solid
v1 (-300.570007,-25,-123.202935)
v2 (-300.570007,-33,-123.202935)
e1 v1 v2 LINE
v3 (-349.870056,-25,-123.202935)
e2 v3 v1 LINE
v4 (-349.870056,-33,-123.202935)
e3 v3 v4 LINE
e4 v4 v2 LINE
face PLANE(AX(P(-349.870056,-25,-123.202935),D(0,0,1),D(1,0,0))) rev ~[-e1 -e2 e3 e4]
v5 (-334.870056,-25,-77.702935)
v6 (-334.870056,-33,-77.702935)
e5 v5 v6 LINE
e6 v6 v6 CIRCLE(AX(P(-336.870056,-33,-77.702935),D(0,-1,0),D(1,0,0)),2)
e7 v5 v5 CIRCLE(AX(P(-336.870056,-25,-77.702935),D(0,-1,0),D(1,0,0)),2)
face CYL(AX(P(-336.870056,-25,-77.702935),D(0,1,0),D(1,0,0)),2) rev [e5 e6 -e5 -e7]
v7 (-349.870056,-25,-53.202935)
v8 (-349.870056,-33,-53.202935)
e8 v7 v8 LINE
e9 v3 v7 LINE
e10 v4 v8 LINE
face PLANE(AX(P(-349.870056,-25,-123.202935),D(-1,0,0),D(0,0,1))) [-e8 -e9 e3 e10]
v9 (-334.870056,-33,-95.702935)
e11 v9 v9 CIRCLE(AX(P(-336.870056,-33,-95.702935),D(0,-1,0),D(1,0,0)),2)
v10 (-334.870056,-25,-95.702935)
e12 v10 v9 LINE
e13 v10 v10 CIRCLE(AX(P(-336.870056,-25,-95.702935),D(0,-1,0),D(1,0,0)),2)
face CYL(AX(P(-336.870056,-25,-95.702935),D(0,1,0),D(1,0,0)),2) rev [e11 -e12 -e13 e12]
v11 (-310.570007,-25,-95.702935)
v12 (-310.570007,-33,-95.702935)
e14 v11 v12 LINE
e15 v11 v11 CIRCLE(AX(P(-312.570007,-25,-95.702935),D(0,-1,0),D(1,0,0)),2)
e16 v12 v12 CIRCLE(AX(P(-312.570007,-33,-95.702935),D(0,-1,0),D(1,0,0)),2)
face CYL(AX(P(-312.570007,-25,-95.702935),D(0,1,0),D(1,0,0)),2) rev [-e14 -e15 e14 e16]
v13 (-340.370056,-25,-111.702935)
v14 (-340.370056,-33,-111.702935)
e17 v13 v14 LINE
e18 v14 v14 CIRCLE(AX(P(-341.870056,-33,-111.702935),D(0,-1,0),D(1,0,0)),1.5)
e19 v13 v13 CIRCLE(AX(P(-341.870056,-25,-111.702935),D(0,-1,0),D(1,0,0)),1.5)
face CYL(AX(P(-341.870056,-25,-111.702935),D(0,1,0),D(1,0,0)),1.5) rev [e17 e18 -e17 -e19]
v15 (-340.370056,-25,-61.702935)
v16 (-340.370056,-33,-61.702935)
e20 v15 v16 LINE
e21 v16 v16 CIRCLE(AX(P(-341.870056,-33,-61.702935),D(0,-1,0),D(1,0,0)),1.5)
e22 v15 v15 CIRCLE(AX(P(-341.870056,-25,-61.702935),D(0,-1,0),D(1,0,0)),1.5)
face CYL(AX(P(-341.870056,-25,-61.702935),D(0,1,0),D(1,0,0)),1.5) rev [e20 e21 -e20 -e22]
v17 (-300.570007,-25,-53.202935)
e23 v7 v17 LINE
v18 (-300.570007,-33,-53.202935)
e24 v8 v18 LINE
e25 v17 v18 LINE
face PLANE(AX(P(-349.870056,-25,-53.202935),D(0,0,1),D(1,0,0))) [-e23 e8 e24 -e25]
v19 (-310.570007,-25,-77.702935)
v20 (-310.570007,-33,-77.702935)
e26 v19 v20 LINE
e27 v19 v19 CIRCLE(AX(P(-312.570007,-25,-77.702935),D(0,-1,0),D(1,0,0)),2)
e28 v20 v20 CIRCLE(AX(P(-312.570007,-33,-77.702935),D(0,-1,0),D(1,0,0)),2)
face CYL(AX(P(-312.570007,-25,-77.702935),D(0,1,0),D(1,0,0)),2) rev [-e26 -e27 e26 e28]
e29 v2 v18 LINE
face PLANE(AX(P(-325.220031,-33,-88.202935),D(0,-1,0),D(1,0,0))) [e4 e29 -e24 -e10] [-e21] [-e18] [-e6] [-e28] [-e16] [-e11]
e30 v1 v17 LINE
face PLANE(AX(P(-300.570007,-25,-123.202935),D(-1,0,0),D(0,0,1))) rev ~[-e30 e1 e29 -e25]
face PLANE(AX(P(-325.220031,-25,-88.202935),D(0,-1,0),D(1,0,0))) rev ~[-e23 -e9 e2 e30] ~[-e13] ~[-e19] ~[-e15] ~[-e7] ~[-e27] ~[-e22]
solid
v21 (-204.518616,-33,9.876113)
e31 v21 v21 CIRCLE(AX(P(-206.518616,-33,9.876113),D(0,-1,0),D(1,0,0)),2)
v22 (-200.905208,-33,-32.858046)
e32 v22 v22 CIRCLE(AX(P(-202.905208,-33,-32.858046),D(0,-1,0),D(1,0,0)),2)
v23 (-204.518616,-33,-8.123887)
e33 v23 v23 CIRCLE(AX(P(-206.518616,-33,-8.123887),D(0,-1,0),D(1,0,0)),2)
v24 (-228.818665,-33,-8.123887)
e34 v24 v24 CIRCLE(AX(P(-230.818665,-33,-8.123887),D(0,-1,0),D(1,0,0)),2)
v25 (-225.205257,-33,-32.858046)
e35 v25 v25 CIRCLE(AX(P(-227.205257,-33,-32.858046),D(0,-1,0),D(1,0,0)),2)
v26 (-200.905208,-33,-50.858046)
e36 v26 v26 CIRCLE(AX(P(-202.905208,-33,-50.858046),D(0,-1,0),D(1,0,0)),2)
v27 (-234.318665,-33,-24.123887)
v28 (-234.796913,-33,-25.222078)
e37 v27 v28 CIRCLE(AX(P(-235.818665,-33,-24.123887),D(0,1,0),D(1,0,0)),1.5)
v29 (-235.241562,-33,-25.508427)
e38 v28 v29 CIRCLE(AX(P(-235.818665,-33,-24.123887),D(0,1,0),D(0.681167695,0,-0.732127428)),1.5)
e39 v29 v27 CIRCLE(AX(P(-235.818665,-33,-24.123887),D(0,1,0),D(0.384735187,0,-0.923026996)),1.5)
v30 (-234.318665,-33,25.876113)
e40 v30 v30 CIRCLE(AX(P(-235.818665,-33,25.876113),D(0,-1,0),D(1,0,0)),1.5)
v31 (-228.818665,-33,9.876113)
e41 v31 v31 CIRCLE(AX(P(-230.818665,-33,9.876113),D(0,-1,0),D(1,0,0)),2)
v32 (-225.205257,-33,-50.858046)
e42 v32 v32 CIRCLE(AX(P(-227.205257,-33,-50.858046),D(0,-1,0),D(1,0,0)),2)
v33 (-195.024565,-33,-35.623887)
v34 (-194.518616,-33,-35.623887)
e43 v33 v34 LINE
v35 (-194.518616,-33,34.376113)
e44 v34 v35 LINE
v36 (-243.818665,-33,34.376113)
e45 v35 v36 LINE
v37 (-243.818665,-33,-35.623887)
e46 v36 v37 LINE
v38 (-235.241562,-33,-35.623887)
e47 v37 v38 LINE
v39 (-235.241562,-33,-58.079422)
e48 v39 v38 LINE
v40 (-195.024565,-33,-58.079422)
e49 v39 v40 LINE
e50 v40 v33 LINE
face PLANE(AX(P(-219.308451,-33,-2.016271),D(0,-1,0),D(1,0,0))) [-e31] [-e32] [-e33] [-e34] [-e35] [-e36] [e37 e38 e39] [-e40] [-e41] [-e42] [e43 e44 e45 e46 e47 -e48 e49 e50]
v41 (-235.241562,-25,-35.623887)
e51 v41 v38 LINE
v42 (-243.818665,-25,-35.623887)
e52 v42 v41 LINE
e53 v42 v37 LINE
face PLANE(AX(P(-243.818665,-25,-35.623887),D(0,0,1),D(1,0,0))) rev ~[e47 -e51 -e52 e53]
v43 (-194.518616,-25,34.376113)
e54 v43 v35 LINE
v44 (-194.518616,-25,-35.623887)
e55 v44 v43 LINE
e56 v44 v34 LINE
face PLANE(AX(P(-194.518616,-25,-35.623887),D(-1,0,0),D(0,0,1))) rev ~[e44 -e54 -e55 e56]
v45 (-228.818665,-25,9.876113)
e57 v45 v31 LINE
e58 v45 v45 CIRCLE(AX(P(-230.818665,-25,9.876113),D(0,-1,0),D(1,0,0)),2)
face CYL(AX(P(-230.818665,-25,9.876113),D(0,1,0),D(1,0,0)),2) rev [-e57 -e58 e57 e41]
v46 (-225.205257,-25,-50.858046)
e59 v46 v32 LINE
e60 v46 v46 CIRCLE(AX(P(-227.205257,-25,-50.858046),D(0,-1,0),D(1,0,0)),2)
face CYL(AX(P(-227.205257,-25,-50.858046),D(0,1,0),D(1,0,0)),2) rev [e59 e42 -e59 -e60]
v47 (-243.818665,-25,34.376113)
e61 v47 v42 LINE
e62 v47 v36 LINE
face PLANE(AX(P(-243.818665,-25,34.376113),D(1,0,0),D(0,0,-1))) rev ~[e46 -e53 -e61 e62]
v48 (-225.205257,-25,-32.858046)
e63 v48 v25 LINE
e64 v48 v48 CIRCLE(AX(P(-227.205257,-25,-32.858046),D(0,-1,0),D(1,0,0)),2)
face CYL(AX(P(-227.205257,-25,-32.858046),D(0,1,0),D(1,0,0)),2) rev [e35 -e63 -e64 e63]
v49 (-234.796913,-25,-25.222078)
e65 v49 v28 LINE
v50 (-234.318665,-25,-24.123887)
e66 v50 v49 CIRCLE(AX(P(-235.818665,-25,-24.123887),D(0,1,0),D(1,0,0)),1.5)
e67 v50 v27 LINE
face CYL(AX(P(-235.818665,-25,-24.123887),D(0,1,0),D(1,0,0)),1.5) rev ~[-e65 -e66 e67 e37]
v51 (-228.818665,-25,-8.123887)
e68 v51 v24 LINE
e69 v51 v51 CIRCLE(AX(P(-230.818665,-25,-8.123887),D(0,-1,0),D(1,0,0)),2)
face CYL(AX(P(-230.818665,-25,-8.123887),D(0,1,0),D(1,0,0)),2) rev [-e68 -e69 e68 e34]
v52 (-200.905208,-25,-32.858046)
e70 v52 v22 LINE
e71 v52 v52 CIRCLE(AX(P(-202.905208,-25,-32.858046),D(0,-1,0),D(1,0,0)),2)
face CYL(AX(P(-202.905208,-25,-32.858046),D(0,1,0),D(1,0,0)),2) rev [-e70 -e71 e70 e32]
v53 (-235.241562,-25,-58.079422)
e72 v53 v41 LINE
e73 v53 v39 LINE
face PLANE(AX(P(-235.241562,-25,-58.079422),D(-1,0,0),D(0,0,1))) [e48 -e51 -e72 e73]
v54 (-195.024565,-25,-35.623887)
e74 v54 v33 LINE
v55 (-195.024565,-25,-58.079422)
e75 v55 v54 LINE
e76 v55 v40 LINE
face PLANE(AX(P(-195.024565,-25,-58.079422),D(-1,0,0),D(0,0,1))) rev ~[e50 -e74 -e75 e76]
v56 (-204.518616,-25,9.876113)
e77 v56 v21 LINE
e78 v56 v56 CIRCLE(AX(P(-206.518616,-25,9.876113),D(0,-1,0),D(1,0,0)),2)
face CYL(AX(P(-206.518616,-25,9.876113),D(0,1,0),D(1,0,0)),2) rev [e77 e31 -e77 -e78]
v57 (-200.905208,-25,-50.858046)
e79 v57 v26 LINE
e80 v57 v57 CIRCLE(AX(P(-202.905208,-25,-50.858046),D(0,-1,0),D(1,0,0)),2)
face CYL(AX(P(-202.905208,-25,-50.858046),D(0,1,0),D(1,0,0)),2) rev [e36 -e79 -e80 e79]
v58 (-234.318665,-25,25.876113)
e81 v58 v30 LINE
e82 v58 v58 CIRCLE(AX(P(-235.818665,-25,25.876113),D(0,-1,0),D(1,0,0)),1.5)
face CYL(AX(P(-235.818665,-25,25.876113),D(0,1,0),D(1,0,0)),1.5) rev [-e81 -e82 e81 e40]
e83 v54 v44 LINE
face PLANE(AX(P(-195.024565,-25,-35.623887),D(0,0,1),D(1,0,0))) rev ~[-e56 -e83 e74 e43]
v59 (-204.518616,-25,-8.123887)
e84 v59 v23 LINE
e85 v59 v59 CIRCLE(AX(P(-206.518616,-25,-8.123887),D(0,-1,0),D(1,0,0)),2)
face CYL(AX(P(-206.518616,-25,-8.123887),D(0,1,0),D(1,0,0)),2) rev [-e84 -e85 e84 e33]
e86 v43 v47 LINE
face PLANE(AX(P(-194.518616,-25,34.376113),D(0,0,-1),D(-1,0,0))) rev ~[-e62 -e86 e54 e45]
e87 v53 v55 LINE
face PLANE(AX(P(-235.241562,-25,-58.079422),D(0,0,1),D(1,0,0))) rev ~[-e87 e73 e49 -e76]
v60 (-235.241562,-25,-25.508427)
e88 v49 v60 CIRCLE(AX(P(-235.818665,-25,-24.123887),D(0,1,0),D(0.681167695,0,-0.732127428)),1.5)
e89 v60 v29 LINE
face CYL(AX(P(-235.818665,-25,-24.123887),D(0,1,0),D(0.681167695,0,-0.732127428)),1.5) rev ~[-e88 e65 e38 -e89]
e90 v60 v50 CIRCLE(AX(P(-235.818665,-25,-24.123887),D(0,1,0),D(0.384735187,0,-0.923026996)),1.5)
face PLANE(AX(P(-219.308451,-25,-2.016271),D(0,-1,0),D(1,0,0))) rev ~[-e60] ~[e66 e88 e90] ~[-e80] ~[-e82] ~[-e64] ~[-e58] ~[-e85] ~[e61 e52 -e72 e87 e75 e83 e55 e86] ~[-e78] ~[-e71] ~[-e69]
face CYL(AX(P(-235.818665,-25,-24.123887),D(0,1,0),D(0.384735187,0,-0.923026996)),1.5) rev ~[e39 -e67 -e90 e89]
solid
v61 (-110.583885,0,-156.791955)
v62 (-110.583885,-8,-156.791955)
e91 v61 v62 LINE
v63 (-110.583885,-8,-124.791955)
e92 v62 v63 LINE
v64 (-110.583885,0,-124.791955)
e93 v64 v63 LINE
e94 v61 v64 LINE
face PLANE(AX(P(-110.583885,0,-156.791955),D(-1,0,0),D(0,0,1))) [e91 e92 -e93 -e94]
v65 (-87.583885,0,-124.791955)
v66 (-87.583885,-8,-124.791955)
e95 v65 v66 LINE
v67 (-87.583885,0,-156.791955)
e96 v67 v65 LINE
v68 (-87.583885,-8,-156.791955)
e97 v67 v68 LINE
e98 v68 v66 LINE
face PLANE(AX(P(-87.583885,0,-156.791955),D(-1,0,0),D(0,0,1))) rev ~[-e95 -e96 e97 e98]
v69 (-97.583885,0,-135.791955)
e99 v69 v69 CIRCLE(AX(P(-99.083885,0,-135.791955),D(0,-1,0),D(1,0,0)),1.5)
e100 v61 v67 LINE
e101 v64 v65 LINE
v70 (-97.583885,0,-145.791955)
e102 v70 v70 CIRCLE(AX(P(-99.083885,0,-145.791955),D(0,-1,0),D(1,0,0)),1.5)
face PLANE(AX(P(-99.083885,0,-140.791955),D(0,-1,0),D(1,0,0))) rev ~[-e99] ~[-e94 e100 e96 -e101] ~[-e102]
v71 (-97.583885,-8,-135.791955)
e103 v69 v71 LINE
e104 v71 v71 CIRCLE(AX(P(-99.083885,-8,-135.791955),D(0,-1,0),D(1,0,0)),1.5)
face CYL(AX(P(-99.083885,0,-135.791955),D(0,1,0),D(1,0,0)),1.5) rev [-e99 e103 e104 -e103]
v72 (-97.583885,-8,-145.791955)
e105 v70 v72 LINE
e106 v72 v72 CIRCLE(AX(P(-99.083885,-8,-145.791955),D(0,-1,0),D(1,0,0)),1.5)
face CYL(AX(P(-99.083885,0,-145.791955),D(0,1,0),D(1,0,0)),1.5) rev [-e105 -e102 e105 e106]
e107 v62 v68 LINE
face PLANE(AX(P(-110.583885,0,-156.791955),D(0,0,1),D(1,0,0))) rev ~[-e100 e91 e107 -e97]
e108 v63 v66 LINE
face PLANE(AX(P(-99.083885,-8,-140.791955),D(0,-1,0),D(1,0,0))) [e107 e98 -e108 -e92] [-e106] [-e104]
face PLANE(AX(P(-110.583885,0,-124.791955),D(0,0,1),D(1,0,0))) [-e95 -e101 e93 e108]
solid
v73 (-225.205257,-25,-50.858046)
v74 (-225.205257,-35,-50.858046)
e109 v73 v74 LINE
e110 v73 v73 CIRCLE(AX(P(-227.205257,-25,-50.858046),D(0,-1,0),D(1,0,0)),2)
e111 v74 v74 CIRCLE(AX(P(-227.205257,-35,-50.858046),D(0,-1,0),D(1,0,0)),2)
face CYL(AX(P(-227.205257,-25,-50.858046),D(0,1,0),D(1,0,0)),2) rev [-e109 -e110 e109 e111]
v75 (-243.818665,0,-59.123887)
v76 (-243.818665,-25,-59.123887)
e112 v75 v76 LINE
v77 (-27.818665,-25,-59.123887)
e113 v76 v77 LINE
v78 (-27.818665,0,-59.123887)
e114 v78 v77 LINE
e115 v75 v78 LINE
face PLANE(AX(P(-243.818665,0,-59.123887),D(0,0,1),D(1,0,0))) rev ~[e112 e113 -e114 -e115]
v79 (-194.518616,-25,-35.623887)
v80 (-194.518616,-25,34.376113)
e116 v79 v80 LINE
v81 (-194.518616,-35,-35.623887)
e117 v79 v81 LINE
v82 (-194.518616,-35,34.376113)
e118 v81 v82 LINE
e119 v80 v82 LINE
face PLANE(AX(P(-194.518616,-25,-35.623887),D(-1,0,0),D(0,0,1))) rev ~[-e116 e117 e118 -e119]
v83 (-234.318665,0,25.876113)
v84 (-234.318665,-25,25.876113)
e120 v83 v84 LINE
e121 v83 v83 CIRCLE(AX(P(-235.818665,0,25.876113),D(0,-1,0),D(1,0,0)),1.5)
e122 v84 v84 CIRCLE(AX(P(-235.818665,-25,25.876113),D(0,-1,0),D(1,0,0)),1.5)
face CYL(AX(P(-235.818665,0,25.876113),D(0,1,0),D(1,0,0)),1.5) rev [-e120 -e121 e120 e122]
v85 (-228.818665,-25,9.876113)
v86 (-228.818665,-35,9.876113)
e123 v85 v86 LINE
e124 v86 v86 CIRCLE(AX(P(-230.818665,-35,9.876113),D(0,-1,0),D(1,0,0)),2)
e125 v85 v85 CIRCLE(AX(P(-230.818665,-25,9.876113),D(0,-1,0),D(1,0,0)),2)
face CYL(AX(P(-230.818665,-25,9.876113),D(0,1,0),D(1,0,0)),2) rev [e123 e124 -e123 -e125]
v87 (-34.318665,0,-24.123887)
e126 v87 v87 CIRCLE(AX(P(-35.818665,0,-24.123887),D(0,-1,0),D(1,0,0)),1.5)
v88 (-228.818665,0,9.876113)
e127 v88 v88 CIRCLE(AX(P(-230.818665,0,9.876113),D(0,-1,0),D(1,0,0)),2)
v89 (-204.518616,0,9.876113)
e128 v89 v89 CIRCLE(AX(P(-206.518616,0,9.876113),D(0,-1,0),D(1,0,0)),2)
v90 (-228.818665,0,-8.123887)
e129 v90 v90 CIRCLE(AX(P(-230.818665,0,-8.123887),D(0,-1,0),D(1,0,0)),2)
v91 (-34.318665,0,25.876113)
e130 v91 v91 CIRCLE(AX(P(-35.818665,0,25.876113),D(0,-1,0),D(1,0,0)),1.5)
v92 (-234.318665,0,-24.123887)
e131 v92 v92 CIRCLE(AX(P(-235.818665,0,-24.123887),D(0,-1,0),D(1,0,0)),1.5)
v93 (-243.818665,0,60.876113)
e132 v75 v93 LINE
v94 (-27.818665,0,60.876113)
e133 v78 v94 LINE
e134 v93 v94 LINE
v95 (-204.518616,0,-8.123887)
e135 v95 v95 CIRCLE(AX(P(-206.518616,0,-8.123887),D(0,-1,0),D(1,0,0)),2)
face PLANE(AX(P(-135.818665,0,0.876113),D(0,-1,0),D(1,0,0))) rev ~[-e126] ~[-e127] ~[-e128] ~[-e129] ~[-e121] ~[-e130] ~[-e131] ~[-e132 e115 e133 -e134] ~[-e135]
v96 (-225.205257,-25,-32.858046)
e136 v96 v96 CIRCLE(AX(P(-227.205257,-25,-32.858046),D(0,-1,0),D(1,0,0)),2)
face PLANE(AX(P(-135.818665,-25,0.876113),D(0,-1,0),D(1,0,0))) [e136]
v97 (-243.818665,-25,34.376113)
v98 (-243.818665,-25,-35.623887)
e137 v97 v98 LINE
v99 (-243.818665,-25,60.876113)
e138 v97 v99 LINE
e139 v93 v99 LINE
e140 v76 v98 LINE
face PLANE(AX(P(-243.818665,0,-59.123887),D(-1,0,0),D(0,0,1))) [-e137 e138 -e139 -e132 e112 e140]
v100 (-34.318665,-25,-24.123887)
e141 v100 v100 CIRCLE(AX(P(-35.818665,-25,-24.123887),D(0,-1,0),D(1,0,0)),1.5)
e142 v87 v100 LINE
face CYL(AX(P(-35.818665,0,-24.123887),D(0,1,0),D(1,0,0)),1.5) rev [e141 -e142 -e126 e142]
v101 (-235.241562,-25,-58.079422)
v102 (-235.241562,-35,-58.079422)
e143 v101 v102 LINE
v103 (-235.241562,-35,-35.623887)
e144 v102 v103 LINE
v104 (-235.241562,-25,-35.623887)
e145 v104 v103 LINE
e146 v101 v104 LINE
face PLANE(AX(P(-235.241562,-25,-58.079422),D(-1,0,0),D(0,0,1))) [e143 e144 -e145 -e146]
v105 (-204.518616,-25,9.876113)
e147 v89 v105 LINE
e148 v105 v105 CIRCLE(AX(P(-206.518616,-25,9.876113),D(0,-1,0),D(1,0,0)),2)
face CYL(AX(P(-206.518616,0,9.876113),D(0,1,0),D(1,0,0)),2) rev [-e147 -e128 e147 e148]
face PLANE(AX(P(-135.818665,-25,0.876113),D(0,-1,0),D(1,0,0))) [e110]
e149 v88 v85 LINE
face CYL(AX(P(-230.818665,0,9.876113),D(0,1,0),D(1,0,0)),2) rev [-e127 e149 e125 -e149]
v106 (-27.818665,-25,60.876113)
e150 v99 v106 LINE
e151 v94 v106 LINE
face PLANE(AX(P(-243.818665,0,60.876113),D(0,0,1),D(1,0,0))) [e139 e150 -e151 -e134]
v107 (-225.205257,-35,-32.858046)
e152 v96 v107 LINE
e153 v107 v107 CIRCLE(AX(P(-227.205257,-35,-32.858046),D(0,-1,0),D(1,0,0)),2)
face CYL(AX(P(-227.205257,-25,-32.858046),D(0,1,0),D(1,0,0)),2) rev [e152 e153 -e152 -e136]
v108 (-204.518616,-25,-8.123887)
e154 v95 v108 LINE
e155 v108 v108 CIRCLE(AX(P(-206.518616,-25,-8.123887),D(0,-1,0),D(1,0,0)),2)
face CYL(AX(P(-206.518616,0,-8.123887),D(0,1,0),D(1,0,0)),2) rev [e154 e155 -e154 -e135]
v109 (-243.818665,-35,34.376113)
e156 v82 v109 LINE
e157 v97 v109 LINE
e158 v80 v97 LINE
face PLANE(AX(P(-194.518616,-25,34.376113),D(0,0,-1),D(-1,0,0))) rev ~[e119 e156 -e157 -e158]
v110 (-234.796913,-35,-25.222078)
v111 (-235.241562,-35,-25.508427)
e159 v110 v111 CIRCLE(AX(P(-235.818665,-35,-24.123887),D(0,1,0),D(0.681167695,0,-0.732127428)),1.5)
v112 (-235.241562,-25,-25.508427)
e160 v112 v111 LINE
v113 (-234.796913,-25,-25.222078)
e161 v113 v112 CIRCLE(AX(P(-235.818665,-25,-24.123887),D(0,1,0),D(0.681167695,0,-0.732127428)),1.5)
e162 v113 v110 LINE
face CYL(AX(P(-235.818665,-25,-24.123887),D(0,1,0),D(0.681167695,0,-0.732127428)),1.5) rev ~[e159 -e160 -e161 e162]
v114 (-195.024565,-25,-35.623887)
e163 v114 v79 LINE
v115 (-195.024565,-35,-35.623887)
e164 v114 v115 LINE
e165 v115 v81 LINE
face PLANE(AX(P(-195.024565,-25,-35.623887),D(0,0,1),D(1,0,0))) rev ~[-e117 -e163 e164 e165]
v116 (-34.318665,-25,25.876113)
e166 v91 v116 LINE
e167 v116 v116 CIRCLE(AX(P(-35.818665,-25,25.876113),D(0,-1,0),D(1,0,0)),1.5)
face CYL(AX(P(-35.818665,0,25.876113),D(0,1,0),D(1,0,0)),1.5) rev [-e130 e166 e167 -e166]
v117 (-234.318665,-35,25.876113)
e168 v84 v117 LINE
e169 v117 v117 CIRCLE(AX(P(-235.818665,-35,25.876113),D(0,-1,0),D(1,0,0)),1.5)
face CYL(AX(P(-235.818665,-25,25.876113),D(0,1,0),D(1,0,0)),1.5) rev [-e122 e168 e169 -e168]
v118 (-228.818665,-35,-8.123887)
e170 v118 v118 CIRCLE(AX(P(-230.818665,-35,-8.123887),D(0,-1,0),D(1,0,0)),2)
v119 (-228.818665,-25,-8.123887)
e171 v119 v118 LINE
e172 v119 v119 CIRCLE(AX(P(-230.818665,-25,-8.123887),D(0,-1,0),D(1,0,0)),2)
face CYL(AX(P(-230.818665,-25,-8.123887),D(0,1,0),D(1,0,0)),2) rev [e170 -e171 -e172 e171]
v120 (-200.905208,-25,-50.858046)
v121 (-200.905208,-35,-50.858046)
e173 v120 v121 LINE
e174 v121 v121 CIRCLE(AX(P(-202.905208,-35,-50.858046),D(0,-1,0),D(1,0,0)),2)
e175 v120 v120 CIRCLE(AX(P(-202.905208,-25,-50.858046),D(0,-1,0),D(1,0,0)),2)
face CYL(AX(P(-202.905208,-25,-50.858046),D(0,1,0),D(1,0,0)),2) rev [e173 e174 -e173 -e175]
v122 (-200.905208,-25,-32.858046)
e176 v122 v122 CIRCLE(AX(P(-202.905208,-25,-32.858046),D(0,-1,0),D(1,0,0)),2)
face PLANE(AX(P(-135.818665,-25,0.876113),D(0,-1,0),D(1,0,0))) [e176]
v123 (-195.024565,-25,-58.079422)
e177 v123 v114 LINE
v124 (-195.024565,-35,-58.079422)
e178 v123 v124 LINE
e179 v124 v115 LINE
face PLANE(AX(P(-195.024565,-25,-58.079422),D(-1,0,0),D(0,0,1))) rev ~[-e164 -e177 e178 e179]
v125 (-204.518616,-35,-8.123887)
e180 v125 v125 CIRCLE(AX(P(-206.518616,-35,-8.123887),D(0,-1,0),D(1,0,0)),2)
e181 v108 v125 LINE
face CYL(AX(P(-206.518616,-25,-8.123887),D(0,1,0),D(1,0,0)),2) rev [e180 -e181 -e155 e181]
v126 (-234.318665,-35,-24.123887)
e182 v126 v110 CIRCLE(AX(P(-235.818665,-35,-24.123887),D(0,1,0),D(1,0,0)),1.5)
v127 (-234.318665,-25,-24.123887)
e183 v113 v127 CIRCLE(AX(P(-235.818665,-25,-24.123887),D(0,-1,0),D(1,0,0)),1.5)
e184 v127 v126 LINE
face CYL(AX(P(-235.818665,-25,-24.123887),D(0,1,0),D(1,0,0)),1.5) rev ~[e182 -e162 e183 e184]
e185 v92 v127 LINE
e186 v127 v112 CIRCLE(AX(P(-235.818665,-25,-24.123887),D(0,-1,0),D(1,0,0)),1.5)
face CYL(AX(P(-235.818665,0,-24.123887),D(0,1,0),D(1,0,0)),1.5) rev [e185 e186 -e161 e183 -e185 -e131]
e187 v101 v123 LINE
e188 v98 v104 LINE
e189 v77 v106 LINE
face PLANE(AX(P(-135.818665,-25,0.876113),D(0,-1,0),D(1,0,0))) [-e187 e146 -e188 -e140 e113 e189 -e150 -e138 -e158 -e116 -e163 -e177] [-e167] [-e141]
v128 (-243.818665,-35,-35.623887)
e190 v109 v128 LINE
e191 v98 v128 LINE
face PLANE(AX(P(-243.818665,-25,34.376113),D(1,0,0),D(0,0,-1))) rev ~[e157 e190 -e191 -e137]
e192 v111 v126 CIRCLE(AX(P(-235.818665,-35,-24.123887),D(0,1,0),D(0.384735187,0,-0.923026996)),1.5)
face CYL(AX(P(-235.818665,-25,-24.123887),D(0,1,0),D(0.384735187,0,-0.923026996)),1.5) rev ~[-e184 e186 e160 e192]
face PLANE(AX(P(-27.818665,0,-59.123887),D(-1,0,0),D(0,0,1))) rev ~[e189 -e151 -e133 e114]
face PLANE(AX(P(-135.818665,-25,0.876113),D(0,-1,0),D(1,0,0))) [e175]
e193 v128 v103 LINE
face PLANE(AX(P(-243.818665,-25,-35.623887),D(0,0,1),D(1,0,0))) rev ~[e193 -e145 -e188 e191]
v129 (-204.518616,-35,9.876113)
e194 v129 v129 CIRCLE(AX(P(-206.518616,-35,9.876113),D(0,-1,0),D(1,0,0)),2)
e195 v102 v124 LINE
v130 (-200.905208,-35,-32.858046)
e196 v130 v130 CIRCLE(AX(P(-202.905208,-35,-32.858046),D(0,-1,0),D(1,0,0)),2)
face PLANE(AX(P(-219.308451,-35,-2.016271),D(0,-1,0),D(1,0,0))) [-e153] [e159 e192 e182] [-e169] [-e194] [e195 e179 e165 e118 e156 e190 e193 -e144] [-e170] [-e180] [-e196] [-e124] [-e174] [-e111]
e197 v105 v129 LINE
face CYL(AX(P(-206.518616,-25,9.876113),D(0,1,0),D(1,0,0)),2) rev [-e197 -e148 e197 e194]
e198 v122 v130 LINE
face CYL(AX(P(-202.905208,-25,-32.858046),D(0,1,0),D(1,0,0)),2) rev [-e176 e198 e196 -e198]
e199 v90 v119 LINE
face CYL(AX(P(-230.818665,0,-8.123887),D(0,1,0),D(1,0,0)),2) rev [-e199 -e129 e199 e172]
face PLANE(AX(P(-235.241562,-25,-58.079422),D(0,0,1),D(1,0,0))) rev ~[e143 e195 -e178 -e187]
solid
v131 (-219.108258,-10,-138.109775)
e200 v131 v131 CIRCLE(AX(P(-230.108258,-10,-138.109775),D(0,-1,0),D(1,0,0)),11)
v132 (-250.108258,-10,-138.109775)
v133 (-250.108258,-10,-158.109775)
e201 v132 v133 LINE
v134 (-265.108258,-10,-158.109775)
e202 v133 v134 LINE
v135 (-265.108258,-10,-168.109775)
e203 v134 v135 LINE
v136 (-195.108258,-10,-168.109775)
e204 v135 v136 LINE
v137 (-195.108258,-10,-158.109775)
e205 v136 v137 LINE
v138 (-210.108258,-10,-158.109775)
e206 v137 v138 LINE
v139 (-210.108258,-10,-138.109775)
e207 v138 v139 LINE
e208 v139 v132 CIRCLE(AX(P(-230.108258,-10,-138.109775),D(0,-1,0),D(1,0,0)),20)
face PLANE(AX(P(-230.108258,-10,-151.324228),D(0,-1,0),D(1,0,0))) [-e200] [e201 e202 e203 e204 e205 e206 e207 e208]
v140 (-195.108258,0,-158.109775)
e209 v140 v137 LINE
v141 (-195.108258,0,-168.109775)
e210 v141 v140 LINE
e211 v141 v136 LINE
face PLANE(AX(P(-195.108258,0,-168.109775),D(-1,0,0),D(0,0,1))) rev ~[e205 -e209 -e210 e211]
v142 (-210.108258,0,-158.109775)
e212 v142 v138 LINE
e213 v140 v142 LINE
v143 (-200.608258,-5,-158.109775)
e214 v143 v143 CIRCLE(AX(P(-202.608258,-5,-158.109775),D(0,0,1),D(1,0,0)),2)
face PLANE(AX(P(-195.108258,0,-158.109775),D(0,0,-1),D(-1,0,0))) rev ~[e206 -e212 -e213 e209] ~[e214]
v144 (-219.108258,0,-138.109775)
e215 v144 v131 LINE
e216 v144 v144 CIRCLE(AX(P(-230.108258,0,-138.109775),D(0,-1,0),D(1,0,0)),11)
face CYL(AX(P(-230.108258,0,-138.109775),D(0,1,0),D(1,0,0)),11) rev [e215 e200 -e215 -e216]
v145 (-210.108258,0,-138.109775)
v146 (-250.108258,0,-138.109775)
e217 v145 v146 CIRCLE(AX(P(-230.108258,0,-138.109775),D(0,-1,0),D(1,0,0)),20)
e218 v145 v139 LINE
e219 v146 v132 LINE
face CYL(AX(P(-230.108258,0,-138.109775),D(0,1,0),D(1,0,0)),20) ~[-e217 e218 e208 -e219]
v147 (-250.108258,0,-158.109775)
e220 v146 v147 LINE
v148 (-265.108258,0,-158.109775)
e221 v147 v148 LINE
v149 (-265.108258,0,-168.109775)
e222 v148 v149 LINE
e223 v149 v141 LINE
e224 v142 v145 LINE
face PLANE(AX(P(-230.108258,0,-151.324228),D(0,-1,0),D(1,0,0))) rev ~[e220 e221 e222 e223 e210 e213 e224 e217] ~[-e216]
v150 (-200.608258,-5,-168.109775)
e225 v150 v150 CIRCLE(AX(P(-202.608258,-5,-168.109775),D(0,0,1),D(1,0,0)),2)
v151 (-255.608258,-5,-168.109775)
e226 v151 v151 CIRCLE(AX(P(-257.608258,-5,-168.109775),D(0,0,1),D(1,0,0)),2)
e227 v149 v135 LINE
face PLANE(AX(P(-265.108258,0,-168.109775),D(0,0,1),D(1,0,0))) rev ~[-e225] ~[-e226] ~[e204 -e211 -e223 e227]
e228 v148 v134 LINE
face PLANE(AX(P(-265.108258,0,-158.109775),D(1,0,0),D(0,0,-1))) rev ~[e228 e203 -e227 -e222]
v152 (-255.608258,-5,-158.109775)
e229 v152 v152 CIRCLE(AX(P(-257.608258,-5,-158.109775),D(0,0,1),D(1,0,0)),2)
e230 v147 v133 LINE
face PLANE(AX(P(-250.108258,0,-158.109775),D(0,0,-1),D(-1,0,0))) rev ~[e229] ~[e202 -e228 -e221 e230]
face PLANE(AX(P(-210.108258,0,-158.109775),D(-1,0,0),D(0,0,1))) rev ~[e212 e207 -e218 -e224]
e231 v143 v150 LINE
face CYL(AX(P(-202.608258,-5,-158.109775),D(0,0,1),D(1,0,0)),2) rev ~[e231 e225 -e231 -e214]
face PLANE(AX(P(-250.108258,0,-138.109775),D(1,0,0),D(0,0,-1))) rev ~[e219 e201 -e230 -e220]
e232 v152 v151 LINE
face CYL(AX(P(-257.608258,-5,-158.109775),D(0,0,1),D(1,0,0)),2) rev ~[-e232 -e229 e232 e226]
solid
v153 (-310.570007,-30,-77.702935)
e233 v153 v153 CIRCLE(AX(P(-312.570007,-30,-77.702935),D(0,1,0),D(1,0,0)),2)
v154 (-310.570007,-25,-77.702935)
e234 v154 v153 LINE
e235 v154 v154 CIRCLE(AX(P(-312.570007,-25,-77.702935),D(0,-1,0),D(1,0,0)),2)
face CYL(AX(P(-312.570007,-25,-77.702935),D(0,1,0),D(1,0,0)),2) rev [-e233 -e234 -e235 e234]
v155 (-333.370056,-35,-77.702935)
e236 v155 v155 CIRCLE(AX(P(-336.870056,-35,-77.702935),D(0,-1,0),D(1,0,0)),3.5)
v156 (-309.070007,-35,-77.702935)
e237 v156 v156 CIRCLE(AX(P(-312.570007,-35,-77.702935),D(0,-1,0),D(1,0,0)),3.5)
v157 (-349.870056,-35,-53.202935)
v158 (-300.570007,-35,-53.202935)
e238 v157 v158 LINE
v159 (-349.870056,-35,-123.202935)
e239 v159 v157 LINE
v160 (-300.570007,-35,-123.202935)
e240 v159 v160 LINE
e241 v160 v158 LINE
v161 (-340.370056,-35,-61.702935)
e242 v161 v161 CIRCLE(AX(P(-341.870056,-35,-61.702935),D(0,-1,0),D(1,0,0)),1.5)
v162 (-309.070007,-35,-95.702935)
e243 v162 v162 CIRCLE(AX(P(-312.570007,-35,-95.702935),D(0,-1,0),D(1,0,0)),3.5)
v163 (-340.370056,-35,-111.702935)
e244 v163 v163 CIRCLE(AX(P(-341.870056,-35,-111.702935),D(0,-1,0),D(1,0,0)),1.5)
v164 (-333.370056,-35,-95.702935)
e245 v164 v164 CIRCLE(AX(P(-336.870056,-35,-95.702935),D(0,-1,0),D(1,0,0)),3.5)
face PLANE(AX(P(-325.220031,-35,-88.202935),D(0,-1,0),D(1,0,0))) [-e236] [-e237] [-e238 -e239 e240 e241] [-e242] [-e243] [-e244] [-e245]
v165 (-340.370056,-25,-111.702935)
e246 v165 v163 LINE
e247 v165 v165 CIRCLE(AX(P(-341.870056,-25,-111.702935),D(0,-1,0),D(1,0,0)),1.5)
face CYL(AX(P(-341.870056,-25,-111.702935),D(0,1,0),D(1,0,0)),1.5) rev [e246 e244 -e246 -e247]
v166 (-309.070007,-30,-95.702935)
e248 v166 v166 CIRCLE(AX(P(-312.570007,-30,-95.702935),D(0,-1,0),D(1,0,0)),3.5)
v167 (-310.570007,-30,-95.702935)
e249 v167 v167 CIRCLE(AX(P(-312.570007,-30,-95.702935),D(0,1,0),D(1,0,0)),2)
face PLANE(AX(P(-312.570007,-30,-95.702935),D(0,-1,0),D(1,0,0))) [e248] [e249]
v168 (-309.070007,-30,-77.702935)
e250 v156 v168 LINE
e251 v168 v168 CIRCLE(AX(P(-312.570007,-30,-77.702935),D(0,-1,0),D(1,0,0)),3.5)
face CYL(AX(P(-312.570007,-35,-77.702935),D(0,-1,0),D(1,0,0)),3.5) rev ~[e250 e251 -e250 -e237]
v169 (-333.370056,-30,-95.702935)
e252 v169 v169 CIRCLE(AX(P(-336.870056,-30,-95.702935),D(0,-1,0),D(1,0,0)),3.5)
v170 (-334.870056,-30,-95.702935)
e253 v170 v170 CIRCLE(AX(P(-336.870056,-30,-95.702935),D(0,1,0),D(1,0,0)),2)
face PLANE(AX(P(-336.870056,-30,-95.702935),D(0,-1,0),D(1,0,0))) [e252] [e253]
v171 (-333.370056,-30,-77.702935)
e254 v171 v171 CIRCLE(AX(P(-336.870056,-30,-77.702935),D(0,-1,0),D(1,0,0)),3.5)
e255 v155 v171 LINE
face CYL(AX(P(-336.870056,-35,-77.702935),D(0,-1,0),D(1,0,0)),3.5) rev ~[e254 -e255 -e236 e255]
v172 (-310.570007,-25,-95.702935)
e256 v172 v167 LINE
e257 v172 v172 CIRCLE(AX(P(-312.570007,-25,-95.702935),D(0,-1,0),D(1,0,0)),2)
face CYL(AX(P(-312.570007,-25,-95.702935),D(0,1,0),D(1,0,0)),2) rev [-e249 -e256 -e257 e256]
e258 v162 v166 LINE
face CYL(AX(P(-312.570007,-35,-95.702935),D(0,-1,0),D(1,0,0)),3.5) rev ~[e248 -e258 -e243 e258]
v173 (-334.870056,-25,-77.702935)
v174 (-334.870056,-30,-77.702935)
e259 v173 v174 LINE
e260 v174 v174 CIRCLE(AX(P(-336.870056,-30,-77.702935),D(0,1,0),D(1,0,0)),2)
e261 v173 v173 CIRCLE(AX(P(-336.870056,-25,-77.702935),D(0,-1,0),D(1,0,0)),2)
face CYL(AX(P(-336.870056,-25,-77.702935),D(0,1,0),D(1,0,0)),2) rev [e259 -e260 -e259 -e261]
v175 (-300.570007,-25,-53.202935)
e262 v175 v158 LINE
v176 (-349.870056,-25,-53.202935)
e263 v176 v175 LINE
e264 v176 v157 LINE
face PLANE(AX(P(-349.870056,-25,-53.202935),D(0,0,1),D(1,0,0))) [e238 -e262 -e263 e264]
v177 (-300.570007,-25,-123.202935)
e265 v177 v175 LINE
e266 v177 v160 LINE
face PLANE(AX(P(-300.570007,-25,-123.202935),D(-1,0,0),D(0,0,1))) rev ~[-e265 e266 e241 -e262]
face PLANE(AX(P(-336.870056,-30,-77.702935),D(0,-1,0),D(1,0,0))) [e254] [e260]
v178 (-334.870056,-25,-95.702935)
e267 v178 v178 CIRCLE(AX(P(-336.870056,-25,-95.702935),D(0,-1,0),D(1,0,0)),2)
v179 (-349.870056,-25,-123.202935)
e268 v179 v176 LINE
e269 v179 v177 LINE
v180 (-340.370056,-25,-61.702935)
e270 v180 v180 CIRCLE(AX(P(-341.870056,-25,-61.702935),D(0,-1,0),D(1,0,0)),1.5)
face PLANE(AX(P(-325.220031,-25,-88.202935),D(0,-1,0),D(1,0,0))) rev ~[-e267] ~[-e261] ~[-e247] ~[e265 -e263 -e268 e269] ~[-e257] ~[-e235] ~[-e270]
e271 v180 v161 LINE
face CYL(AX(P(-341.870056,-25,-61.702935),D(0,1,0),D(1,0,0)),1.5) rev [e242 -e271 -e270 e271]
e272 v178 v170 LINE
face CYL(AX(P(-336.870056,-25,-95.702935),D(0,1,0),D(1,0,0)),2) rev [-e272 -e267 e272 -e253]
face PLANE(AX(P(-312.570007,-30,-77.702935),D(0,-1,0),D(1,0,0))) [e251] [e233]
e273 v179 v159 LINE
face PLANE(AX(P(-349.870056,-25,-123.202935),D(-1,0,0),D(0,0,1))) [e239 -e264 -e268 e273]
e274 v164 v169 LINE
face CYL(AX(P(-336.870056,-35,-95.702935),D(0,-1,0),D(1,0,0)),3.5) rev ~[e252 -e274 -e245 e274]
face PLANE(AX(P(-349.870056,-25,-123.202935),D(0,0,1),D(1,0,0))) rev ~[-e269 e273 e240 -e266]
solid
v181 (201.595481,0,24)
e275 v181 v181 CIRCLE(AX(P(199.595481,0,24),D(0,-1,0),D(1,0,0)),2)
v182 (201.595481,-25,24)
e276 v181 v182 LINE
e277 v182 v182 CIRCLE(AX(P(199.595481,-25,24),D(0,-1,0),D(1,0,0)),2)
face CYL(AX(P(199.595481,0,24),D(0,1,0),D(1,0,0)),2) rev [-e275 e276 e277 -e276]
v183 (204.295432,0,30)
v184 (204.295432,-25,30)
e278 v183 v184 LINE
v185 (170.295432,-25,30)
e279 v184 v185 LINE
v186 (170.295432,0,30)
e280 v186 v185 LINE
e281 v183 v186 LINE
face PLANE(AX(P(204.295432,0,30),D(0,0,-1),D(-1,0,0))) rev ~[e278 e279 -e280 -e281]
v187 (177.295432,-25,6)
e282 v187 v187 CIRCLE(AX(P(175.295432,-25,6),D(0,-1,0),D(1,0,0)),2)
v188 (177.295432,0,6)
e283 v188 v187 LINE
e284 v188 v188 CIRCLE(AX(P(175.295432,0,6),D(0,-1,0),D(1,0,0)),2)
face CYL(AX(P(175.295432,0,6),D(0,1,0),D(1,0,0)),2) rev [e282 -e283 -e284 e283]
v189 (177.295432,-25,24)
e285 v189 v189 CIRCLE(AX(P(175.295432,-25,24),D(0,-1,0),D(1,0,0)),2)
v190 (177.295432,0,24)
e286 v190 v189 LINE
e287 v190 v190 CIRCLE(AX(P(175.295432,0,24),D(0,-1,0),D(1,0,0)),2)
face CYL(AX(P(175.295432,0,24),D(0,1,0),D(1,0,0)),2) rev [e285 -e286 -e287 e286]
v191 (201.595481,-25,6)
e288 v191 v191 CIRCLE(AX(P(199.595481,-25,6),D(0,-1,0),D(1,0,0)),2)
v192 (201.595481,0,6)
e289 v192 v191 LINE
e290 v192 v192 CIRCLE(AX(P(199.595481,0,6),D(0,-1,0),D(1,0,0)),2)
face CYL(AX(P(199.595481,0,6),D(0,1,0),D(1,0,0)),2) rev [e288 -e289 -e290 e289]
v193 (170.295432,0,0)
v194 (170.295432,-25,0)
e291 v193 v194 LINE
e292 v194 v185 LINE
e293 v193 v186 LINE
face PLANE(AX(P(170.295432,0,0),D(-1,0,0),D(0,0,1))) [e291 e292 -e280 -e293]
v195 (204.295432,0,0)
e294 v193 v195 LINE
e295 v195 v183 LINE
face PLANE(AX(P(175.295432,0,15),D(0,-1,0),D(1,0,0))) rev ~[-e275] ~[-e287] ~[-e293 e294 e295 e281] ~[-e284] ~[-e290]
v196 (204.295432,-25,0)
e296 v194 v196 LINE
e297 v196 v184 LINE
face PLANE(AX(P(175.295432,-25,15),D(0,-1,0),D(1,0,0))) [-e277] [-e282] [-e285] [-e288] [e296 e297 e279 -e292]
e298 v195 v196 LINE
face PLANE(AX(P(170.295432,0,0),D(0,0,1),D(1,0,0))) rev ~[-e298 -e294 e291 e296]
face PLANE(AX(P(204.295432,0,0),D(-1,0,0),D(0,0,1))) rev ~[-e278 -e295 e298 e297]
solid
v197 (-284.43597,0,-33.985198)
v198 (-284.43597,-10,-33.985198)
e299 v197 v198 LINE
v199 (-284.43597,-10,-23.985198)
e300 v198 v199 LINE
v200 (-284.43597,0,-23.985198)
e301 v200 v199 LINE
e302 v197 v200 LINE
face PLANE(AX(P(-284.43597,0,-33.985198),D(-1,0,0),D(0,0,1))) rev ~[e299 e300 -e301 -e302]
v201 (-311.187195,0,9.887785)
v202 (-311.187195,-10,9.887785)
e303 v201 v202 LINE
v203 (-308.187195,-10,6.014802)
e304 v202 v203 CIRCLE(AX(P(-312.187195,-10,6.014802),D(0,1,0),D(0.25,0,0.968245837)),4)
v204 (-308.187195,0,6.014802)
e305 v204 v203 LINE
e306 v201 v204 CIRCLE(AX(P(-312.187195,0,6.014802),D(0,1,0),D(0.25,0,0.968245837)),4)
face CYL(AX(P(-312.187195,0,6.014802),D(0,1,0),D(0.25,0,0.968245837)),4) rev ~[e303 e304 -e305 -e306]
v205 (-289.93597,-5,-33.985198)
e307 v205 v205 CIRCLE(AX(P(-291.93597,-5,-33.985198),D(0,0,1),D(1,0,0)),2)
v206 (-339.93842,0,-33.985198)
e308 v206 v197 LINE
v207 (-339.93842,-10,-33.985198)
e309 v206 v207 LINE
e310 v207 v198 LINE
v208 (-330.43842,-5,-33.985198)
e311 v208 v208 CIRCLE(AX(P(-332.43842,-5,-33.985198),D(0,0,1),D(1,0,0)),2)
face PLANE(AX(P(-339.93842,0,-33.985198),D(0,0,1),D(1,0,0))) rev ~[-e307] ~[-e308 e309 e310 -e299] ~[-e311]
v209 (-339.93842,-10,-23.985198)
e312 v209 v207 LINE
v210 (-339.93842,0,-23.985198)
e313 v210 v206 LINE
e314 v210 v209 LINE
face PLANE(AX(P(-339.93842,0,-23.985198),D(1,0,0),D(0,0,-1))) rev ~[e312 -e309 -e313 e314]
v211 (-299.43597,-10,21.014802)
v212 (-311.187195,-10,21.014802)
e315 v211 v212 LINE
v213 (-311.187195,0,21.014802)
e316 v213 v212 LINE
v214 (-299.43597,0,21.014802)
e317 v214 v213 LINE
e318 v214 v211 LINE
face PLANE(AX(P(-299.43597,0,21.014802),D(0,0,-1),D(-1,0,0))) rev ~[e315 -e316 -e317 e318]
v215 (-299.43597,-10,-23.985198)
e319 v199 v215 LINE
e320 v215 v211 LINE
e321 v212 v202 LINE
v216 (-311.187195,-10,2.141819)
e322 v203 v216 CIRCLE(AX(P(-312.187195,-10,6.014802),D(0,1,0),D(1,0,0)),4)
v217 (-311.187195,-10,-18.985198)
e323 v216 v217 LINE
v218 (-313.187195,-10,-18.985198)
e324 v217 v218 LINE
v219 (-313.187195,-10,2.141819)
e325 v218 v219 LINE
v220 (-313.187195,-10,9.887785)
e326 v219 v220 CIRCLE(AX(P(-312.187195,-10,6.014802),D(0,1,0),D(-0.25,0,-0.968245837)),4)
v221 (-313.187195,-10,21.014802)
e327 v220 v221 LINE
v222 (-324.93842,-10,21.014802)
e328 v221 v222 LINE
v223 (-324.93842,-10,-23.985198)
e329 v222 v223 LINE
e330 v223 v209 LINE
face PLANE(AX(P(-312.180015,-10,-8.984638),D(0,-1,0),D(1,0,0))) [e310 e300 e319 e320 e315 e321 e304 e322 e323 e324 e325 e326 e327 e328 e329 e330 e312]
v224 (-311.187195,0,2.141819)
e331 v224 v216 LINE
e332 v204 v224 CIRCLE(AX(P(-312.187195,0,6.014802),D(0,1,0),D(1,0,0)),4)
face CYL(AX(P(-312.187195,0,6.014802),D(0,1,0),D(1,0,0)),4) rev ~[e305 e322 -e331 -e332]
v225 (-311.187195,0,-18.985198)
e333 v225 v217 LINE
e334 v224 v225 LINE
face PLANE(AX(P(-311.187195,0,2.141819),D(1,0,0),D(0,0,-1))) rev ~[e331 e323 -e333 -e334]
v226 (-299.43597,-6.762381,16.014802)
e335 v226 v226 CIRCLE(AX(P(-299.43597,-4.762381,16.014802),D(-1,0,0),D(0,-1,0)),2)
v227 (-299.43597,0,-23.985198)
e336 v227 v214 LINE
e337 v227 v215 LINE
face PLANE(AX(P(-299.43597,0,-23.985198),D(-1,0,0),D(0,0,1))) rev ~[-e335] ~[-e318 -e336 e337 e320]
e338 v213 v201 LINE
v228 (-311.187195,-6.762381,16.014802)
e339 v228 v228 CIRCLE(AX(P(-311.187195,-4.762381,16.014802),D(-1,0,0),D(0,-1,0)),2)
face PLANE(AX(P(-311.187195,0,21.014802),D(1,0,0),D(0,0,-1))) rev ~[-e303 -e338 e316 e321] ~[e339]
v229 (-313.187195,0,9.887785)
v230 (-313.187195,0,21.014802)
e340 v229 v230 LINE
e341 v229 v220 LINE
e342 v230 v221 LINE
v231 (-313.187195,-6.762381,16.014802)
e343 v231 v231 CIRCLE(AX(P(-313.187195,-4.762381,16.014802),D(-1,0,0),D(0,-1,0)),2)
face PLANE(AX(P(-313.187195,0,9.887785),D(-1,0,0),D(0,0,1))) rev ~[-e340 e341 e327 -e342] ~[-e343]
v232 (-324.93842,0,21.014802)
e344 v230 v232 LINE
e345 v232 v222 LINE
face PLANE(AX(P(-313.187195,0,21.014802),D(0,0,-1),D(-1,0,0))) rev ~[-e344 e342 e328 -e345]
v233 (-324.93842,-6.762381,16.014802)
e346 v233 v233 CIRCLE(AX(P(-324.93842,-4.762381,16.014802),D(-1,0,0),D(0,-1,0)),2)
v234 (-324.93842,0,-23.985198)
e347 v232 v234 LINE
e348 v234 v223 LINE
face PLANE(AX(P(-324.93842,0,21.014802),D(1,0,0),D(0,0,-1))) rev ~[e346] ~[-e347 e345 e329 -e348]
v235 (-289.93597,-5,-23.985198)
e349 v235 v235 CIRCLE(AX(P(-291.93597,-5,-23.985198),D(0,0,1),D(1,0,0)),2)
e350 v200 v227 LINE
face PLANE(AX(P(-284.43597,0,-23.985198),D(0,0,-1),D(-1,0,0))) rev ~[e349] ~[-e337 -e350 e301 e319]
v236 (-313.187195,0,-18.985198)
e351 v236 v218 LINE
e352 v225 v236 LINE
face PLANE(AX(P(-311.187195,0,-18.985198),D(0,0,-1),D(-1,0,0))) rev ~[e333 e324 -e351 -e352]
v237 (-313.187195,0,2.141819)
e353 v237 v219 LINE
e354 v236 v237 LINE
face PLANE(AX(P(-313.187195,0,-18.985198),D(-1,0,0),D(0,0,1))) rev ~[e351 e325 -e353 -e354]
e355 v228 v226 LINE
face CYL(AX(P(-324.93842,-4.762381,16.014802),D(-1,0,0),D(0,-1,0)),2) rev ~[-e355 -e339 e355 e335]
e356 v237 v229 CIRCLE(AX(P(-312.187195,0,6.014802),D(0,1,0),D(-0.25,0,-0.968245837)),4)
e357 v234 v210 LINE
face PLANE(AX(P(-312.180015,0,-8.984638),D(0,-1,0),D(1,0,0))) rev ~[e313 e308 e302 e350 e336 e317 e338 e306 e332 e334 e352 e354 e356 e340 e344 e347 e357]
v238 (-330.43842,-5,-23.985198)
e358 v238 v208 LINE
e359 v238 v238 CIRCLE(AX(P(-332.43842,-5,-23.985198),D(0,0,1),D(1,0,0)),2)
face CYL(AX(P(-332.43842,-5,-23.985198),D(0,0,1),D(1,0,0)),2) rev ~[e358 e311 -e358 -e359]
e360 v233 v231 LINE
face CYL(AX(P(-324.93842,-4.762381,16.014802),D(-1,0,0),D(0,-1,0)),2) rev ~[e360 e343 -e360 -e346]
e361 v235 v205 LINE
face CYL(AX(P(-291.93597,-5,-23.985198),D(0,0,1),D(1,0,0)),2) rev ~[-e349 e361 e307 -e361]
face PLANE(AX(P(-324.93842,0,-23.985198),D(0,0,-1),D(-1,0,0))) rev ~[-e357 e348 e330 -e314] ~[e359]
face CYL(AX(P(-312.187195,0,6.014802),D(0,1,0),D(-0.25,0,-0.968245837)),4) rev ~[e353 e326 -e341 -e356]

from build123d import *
from build123d import SkipClean  # not in build123d's __all__

# Parameters (mm, degrees)
F0_R      = 11
F1_DEPTH  = 10
F2_R      = 2
F3_DEPTH  = 25
F4_DEPTH  = 10
F5_R      = 2
F6_DEPTH  = 36.2
F8_R      = 2
F7_R      = 2
F9_DEPTH  = 25
F10_W     = 10
F10_H     = 30
F10_R     = 2
F10_W_2   = 14
F11_DEPTH = 25
F10_W_3   = 216
F10_H_2   = 120
F10_R_2   = 1.5
F12_R     = 2
F12_R_2   = 1.5
F12_W     = 40.2169972658
F12_H     = 22.4555346966
F13_DEPTH = 10
F12_W_2   = 49.3000489473
F12_H_2   = 70
F14_R     = 3.5
F15_DEPTH = 5
F0_W      = 23
F0_H      = 32
F0_R_2    = 1.5
F16_DEPTH = 8


# Not quite as in the source:
# - a feature names something its author has since deleted; it is built from what else it names


with BuildPart() as f1:
    # F0 (on Front) → F1 (new body)
    with BuildSketch(Plane.XZ):
        with BuildLine():
            ThreePointArc((-210.1082575321, -138.1097745895), (-230.1082575321, -118.1097745895), (-250.1082575321, -138.1097745895))
            Line((-250.1082575321, -138.1097745895), (-250.1082575321, -158.1097745895))
            Line((-250.1082575321, -158.1097745895), (-265.1082575321, -158.1097745895))
            Line((-265.1082575321, -158.1097745895), (-265.1082575321, -168.1097745895))
            Line((-265.1082575321, -168.1097745895), (-195.1082575321, -168.1097745895))
            Line((-195.1082575321, -168.1097745895), (-195.1082575321, -158.1097745895))
            Line((-195.1082575321, -158.1097745895), (-210.1082575321, -158.1097745895))
            Line((-210.1082575321, -158.1097745895), (-210.1082575321, -138.1097745895))
        make_face()
        with Locations((-230.1082575321, -138.1097745895)):
            Circle(F0_R, mode=Mode.SUBTRACT)
    extrude(amount=F1_DEPTH)

    # F2 (on face) → F3 (cut)
    with BuildSketch(Plane.XY.offset(-158.1097745895)):
        with Locations((-257.6082575321, -5)):
            Circle(F2_R)
        with Locations((-202.6082575321, -5)):
            Circle(F2_R)
    extrude(amount=-F3_DEPTH, mode=Mode.SUBTRACT)


with BuildPart() as f4:
    # F0 (on Front) → F4 (new body)
    with BuildSketch(Plane.XZ):
        with BuildLine():
            Line((-313.1871948242, 21.0148020371), (-324.9384198033, 21.0148020371))
            Line((-324.9384198033, 21.0148020371), (-324.9384198033, -23.9851979629))
            Line((-324.9384198033, -23.9851979629), (-339.9384198033, -23.9851979629))
            Line((-339.9384198033, -23.9851979629), (-339.9384198033, -33.9851979629))
            Line((-339.9384198033, -33.9851979629), (-284.4359698451, -33.9851979629))
            Line((-284.4359698451, -33.9851979629), (-284.4359698451, -23.9851979629))
            Line((-284.4359698451, -23.9851979629), (-299.4359698451, -23.9851979629))
            Line((-299.4359698451, -23.9851979629), (-299.4359698451, 21.0148020371))
            Line((-299.4359698451, 21.0148020371), (-311.1871948242, 21.0148020371))
            Line((-311.1871948242, 21.0148020371), (-311.1871948242, 9.8877853833))
            ThreePointArc((-311.1871948242, 9.8877853833), (-309.0249171641, 8.4642917799), (-308.1871948242, 6.0148020371))
            ThreePointArc((-308.1871948242, 6.0148020371), (-309.0249171641, 3.5653122943), (-311.1871948242, 2.1418186909))
            Line((-311.1871948242, 2.1418186909), (-311.1871948242, -18.9851979629))
            Line((-311.1871948242, -18.9851979629), (-313.1871948242, -18.9851979629))
            Line((-313.1871948242, -18.9851979629), (-313.1871948242, 2.1418186909))
            ThreePointArc((-313.1871948242, 2.1418186909), (-316.1871948242, 6.0148020371), (-313.1871948242, 9.8877853833))
            Line((-313.1871948242, 9.8877853833), (-313.1871948242, 21.0148020371))
        make_face()
    extrude(amount=F4_DEPTH)

    # F5 (on face) → F6 (cut)
    with BuildSketch(Plane(origin=(-324.9384198033, 0, 0), x_dir=(0, -1, 0), z_dir=(-1, 0, 0))):
        with Locations((4.7623808496, 16.0148020371)):
            Circle(F5_R)
    extrude(amount=-F6_DEPTH, mode=Mode.SUBTRACT)

    # F8 (on face) + F7 (on face) → F9 (cut)
    with BuildSketch(Plane.XY.offset(-23.9851979629)):
        with Locations((-291.9359698451, -5)):
            Circle(F8_R)
    with BuildSketch(Plane.XY.offset(-23.9851979629)):
        with Locations((-332.4384198033, -5)):
            Circle(F7_R)
    extrude(amount=-F9_DEPTH, mode=Mode.SUBTRACT)


with BuildPart() as f11:
    # F10 (on Front) → F11 (new body)
    with BuildSketch(Plane.XZ):
        with Locations((175.29543221, 15)):
            Rectangle(F10_W, F10_H)
        with Locations((175.29543221, 6)):
            Circle(F10_R, mode=Mode.SUBTRACT)
        with Locations((175.29543221, 24)):
            Circle(F10_R, mode=Mode.SUBTRACT)
        with Locations((199.29543221, 15)):
            Rectangle(F10_W, F10_H)
        with Locations((199.5954811573, 6)):
            Circle(F10_R, mode=Mode.SUBTRACT)
        with Locations((199.5954811573, 24)):
            Circle(F10_R, mode=Mode.SUBTRACT)
        with Locations((187.29543221, 15)):
            Rectangle(F10_W_2, F10_H)
    extrude(amount=F11_DEPTH)


with BuildPart() as f11b:
    # F10 (on Front) → F11, piece 2 (new body)
    with BuildSketch(Plane.XZ):
        with Locations((-135.8186649084, 0.8761131763)):
            Rectangle(F10_W_3, F10_H_2)
        with Locations((-235.8186649084, -24.1238868237)):
            Circle(F10_R_2, mode=Mode.SUBTRACT)
        Polygon((-235.8186649084, -14.1238868237), (-235.8186649084, 15.8761131763), (-225.8186649084, 15.8761131763), (-211.8186649084, 15.8761131763), (-201.8186649084, 15.8761131763), (-201.8186649084, -14.1238868237), (-211.8186649084, -14.1238868237), (-225.8186649084, -14.1238868237), align=None, mode=Mode.SUBTRACT)
        with Locations((-35.8186649084, -24.1238868237)):
            Circle(F10_R_2, mode=Mode.SUBTRACT)
        with Locations((-235.8186649084, 25.8761131763)):
            Circle(F10_R_2, mode=Mode.SUBTRACT)
        with Locations((-35.8186649084, 25.8761131763)):
            Circle(F10_R_2, mode=Mode.SUBTRACT)
        with Locations((-230.8186649084, 0.8761131763)):
            Rectangle(F10_W, F10_H)
        with Locations((-230.8186649084, -8.1238868237)):
            Circle(F10_R, mode=Mode.SUBTRACT)
        with Locations((-230.8186649084, 9.8761131763)):
            Circle(F10_R, mode=Mode.SUBTRACT)
        with Locations((-218.8186649084, 0.8761131763)):
            Rectangle(F10_W_2, F10_H)
        with Locations((-206.8186649084, 0.8761131763)):
            Rectangle(F10_W, F10_H)
        with Locations((-206.5186159611, -8.1238868237)):
            Circle(F10_R, mode=Mode.SUBTRACT)
        with Locations((-206.5186159611, 9.8761131763)):
            Circle(F10_R, mode=Mode.SUBTRACT)
    extrude(amount=F11_DEPTH)

    # F12 (on face) → F13 (join)
    with BuildSketch(Plane.XZ.offset(25)):
        with BuildLine():
            Line((-194.5186159611, -35.6238868237), (-194.5186159611, 34.3761131763))
            Line((-194.5186159611, 34.3761131763), (-243.8186649084, 34.3761131763))
            Line((-243.8186649084, 34.3761131763), (-243.8186649084, -35.6238868237))
            Line((-243.8186649084, -35.6238868237), (-235.2415621281, -35.6238868237))
            Line((-235.2415621281, -35.6238868237), (-235.2415621281, -25.5084273182))
            ThreePointArc((-235.2415621281, -25.5084273182), (-237.0667943429, -23.2919175245), (-234.3186649084, -24.1238868237))
            ThreePointArc((-234.3186649084, -24.1238868237), (-234.4434145104, -24.7227911088), (-234.7969133655, -25.2220779657))
            Line((-234.7969133655, -25.2220779657), (-195.0245648623, -25.2220779657))
            Line((-195.0245648623, -25.2220779657), (-195.0245648623, -35.6238868237))
            Line((-195.0245648623, -35.6238868237), (-194.5186159611, -35.6238868237))
        make_face()
        with Locations((-230.8186649084, -8.1238868237)):
            Circle(F12_R, mode=Mode.SUBTRACT)
        with Locations((-206.5186159611, -8.1238868237)):
            Circle(F12_R, mode=Mode.SUBTRACT)
        with Locations((-235.8186649084, 25.8761131763)):
            Circle(F12_R_2, mode=Mode.SUBTRACT)
        with Locations((-230.8186649084, 9.8761131763)):
            Circle(F12_R, mode=Mode.SUBTRACT)
        with Locations((-206.5186159611, 9.8761131763)):
            Circle(F12_R, mode=Mode.SUBTRACT)
        with Locations((-215.1330634952, -46.8516541719)):
            Rectangle(F12_W, F12_H)
        with Locations((-227.2052568197, -50.8580457568)):
            Circle(F12_R, mode=Mode.SUBTRACT)
        with Locations((-202.9052078724, -50.8580457568)):
            Circle(F12_R, mode=Mode.SUBTRACT)
        with BuildLine():
            Line((-235.2415621281, -35.6238868237), (-195.0245648623, -35.6238868237))
            Line((-195.0245648623, -35.6238868237), (-195.0245648623, -25.2220779657))
            Line((-195.0245648623, -25.2220779657), (-234.7969133655, -25.2220779657))
            ThreePointArc((-234.7969133655, -25.2220779657), (-235.006517893, -25.3850042747), (-235.2415621281, -25.5084273182))
            Line((-235.2415621281, -25.5084273182), (-235.2415621281, -35.6238868237))
        make_face()
        with Locations((-227.2052568197, -32.8580457568)):
            Circle(F12_R, mode=Mode.SUBTRACT)
        with Locations((-202.9052078724, -32.8580457568)):
            Circle(F12_R, mode=Mode.SUBTRACT)
    with SkipClean():  # cleaning this boolean's faces spoils the solid; the shape is the same uncleaned
        extrude(amount=F13_DEPTH)


with BuildPart() as f13:
    # F12 (on face) → F13, piece 2 (new body)
    with BuildSketch(Plane.XZ.offset(25)):
        with Locations((-325.2200314403, -88.2029348612)):
            Rectangle(F12_W_2, F12_H_2)
        with Locations((-341.8700559139, -111.7029348612)):
            Circle(F12_R_2, mode=Mode.SUBTRACT)
        with Locations((-336.8700559139, -95.7029348612)):
            Circle(F12_R, mode=Mode.SUBTRACT)
        with Locations((-312.5700069666, -95.7029348612)):
            Circle(F12_R, mode=Mode.SUBTRACT)
        with Locations((-336.8700559139, -77.7029348612)):
            Circle(F12_R, mode=Mode.SUBTRACT)
        with Locations((-312.5700069666, -77.7029348612)):
            Circle(F12_R, mode=Mode.SUBTRACT)
        with Locations((-341.8700559139, -61.7029348612)):
            Circle(F12_R_2, mode=Mode.SUBTRACT)
    extrude(amount=F13_DEPTH)

    # F14 (on face) → F15 (cut)
    with BuildSketch(Plane.XZ.offset(35)):
        with Locations((-336.8700559139, -77.7029348612)):
            Circle(F14_R)
        with Locations((-312.5700069666, -77.7029348612)):
            Circle(F14_R)
        with Locations((-336.8700559139, -95.7029348612)):
            Circle(F14_R)
        with Locations((-312.5700069666, -95.7029348612)):
            Circle(F14_R)
    extrude(amount=-F15_DEPTH, mode=Mode.SUBTRACT)


with BuildPart() as f16:
    # F0 (on Front) → F16 (new body)
    with BuildSketch(Plane.XZ):
        with Locations((-99.0838845968, -140.7919552326)):
            Rectangle(F0_W, F0_H)
        with Locations((-99.0838845968, -145.7919552326)):
            Circle(F0_R_2, mode=Mode.SUBTRACT)
        with Locations((-99.0838845968, -135.7919552326)):
            Circle(F0_R_2, mode=Mode.SUBTRACT)
    extrude(amount=F16_DEPTH)


with BuildPart() as f16b:
    # F12 (on face) → F16, piece 2 (new body)
    with BuildSketch(Plane.XZ.offset(25)):
        with BuildLine():
            Line((-194.5186159611, -35.6238868237), (-194.5186159611, 34.3761131763))
            Line((-194.5186159611, 34.3761131763), (-243.8186649084, 34.3761131763))
            Line((-243.8186649084, 34.3761131763), (-243.8186649084, -35.6238868237))
            Line((-243.8186649084, -35.6238868237), (-235.2415621281, -35.6238868237))
            Line((-235.2415621281, -35.6238868237), (-235.2415621281, -25.5084273182))
            ThreePointArc((-235.2415621281, -25.5084273182), (-237.0667943429, -23.2919175245), (-234.3186649084, -24.1238868237))
            ThreePointArc((-234.3186649084, -24.1238868237), (-234.4434145104, -24.7227911088), (-234.7969133655, -25.2220779657))
            Line((-234.7969133655, -25.2220779657), (-195.0245648623, -25.2220779657))
            Line((-195.0245648623, -25.2220779657), (-195.0245648623, -35.6238868237))
            Line((-195.0245648623, -35.6238868237), (-194.5186159611, -35.6238868237))
        make_face()
        with Locations((-230.8186649084, -8.1238868237)):
            Circle(F12_R, mode=Mode.SUBTRACT)
        with Locations((-206.5186159611, -8.1238868237)):
            Circle(F12_R, mode=Mode.SUBTRACT)
        with Locations((-235.8186649084, 25.8761131763)):
            Circle(F12_R_2, mode=Mode.SUBTRACT)
        with Locations((-230.8186649084, 9.8761131763)):
            Circle(F12_R, mode=Mode.SUBTRACT)
        with Locations((-206.5186159611, 9.8761131763)):
            Circle(F12_R, mode=Mode.SUBTRACT)
        with Locations((-215.1330634952, -46.8516541719)):
            Rectangle(F12_W, F12_H)
        with Locations((-227.2052568197, -50.8580457568)):
            Circle(F12_R, mode=Mode.SUBTRACT)
        with Locations((-202.9052078724, -50.8580457568)):
            Circle(F12_R, mode=Mode.SUBTRACT)
        with BuildLine():
            Line((-235.2415621281, -35.6238868237), (-195.0245648623, -35.6238868237))
            Line((-195.0245648623, -35.6238868237), (-195.0245648623, -25.2220779657))
            Line((-195.0245648623, -25.2220779657), (-234.7969133655, -25.2220779657))
            ThreePointArc((-234.7969133655, -25.2220779657), (-235.006517893, -25.3850042747), (-235.2415621281, -25.5084273182))
            Line((-235.2415621281, -25.5084273182), (-235.2415621281, -35.6238868237))
        make_face()
        with Locations((-227.2052568197, -32.8580457568)):
            Circle(F12_R, mode=Mode.SUBTRACT)
        with Locations((-202.9052078724, -32.8580457568)):
            Circle(F12_R, mode=Mode.SUBTRACT)
    extrude(amount=F16_DEPTH)


with BuildPart() as f16c:
    # F12 (on face) → F16, piece 3 (new body)
    with BuildSketch(Plane.XZ.offset(25)):
        with Locations((-325.2200314403, -88.2029348612)):
            Rectangle(F12_W_2, F12_H_2)
        with Locations((-341.8700559139, -111.7029348612)):
            Circle(F12_R_2, mode=Mode.SUBTRACT)
        with Locations((-336.8700559139, -95.7029348612)):
            Circle(F12_R, mode=Mode.SUBTRACT)
        with Locations((-312.5700069666, -95.7029348612)):
            Circle(F12_R, mode=Mode.SUBTRACT)
        with Locations((-336.8700559139, -77.7029348612)):
            Circle(F12_R, mode=Mode.SUBTRACT)
        with Locations((-312.5700069666, -77.7029348612)):
            Circle(F12_R, mode=Mode.SUBTRACT)
        with Locations((-341.8700559139, -61.7029348612)):
            Circle(F12_R_2, mode=Mode.SUBTRACT)
    extrude(amount=F16_DEPTH)


solid = Compound([f1.part, f4.part, f11.part, f11b.part, f13.part, f16.part, f16b.part, f16c.part])
